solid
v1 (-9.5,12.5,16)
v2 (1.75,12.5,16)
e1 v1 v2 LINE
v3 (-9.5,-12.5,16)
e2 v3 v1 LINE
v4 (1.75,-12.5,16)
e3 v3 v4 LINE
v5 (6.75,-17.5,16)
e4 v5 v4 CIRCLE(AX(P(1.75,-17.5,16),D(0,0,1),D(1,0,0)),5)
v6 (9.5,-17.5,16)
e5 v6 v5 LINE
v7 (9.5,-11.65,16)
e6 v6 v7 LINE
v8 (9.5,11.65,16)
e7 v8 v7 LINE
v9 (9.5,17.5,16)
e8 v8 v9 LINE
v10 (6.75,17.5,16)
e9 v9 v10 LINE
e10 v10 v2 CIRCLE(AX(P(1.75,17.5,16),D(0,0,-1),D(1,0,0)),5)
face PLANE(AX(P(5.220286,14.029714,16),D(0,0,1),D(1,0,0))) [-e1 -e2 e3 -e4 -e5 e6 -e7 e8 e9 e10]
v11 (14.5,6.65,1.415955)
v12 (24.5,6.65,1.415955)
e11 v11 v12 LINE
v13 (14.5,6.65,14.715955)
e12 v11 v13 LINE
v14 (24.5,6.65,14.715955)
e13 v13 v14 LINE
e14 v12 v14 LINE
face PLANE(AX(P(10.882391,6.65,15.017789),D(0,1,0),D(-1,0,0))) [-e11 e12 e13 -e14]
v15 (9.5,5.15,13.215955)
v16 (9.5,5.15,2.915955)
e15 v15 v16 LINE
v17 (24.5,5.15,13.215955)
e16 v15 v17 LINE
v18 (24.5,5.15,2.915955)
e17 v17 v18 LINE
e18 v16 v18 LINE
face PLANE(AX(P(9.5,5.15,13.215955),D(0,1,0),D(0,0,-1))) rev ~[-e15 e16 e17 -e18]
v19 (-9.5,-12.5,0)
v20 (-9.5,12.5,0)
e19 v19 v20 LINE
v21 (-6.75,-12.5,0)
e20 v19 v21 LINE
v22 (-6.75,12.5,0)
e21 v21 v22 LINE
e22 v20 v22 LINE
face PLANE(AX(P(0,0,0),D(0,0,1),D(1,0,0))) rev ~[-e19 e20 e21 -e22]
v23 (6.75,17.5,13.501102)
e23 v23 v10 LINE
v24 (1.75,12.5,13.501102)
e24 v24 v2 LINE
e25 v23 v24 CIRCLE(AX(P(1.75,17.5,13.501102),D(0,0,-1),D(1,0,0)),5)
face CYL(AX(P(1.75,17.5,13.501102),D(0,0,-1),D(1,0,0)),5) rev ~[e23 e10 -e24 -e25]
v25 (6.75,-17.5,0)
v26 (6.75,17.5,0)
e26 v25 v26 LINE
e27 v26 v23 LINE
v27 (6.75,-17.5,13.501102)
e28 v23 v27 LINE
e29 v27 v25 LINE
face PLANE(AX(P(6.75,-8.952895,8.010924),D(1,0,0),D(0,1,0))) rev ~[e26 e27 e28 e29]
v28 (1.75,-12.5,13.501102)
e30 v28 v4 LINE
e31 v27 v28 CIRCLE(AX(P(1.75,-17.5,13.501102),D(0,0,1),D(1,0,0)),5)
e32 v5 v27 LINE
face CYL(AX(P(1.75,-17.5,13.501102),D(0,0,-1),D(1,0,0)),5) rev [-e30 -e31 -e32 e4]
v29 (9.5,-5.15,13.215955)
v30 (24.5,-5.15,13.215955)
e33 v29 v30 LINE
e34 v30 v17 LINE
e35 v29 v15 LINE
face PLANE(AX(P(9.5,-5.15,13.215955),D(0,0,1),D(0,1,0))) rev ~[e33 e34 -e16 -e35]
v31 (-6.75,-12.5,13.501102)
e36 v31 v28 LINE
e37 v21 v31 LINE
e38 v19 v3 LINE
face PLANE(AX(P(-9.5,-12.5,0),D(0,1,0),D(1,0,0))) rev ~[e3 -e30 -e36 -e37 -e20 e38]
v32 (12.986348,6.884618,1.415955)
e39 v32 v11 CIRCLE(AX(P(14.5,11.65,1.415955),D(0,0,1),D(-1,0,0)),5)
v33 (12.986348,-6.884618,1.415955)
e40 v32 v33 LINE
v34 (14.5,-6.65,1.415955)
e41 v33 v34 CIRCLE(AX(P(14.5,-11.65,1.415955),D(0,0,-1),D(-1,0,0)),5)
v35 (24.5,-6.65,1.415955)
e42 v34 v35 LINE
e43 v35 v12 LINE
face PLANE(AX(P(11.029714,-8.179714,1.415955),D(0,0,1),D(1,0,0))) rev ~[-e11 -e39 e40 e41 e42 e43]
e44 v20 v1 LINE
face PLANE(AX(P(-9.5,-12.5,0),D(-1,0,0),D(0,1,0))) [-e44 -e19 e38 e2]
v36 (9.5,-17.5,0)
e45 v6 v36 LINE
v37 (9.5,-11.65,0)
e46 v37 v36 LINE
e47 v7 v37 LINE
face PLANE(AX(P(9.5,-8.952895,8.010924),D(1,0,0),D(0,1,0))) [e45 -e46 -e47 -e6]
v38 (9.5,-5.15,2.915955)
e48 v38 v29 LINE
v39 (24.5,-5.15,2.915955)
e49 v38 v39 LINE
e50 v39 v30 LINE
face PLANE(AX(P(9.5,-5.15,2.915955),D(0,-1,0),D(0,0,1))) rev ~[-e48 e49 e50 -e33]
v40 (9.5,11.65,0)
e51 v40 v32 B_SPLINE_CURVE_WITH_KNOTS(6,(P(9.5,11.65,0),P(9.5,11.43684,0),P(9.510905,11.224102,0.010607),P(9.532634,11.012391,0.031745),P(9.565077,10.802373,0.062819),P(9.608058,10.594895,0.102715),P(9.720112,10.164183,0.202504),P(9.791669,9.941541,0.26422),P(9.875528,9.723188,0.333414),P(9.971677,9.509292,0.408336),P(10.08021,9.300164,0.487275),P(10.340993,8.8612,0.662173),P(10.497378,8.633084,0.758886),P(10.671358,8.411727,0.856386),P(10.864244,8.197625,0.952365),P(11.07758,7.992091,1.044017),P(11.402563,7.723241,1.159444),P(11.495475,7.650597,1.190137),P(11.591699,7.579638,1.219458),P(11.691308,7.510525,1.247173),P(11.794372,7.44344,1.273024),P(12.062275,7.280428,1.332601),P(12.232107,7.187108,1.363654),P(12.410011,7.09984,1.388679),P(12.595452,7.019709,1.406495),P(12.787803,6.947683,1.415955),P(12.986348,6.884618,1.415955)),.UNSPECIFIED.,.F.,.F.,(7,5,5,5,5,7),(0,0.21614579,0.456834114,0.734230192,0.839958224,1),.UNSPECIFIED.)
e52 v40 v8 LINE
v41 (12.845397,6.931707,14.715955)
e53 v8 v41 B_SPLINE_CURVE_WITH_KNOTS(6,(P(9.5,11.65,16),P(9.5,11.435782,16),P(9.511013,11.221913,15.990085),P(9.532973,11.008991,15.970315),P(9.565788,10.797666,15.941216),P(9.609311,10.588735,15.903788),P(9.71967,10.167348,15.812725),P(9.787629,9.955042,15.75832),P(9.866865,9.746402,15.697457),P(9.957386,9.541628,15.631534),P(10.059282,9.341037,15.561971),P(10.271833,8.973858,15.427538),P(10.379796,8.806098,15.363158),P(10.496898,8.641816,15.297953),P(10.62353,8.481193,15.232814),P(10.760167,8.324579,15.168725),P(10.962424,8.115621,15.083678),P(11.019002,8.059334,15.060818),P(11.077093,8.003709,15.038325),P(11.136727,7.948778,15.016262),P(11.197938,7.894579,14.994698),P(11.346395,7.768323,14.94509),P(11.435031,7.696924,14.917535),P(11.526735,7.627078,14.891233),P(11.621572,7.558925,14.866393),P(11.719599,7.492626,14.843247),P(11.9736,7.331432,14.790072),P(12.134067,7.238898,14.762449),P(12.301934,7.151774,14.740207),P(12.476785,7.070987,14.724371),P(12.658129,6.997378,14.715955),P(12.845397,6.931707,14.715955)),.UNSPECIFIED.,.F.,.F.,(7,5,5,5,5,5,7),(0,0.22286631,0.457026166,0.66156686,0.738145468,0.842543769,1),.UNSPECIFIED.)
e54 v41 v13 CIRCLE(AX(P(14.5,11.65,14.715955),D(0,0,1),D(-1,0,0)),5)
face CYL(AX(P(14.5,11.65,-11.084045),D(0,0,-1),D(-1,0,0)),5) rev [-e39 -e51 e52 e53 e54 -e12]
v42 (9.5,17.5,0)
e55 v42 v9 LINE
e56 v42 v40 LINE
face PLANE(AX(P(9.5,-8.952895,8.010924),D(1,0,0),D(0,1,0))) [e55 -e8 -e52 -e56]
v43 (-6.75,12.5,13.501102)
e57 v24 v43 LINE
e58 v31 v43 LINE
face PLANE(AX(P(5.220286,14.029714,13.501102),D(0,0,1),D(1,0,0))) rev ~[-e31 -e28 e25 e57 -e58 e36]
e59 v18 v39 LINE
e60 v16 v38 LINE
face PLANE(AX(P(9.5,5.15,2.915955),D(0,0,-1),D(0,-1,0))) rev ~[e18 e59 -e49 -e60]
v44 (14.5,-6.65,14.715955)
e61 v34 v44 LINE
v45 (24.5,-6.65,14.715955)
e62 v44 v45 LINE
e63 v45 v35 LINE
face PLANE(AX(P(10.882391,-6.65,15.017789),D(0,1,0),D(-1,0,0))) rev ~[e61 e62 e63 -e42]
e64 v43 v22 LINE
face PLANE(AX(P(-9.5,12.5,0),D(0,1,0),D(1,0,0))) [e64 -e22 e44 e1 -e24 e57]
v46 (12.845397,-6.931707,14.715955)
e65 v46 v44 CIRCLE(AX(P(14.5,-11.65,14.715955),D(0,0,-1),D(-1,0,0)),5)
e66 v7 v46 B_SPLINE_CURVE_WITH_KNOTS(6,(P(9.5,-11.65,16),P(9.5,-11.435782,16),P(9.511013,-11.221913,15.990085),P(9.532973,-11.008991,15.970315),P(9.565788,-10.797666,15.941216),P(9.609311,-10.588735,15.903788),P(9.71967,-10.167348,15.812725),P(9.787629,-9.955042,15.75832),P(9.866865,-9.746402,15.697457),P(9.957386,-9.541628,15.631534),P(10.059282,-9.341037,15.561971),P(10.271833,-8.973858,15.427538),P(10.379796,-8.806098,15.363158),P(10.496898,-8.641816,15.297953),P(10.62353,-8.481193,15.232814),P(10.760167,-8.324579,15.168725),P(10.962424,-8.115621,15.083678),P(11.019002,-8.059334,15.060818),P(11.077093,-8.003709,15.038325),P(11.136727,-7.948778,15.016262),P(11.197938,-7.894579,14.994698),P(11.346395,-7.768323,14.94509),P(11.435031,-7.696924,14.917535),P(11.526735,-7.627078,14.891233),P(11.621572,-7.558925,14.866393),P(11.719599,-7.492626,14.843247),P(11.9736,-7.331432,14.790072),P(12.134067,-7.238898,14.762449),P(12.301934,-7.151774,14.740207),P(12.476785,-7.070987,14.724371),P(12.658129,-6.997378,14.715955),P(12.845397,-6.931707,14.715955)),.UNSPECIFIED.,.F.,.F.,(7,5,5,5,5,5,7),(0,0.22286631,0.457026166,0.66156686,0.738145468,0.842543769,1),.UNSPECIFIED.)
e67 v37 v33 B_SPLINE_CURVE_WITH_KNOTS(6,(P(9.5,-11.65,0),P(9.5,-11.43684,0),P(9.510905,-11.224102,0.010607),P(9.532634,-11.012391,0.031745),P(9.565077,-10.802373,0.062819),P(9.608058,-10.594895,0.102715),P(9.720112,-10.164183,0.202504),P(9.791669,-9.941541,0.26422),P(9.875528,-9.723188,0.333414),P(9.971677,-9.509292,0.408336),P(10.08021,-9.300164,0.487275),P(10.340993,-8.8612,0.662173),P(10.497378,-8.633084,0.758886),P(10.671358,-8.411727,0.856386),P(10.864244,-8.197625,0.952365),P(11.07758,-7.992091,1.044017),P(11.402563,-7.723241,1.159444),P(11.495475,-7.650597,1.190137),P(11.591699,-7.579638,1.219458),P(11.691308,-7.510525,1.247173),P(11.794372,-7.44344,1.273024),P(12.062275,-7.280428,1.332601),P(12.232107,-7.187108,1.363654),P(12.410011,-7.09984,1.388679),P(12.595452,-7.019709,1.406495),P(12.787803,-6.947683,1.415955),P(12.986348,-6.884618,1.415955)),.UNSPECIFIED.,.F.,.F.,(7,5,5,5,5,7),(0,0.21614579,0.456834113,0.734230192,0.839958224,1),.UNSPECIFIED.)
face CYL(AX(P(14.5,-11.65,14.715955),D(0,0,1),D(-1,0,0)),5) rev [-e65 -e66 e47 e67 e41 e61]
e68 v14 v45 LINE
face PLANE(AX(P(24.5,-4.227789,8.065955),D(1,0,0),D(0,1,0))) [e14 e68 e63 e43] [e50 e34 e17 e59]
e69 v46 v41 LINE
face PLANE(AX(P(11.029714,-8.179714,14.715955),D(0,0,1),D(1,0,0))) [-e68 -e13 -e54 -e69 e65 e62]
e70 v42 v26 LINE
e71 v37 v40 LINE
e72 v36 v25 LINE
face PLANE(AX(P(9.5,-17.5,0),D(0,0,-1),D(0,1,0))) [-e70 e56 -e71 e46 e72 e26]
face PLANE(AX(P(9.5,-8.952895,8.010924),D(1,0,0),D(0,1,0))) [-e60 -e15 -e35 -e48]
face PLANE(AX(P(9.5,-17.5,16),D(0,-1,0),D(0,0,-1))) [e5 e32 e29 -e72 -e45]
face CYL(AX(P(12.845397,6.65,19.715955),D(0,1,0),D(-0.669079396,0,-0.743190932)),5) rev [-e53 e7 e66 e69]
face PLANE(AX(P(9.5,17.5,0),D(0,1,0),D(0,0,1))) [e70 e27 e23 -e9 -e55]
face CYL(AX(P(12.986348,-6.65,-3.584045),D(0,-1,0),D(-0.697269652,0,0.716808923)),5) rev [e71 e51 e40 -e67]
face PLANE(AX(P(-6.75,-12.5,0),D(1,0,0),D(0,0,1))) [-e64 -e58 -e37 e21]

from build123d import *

# Parameters (mm, degrees)
F0_W         = 19
F0_H         = 25
F1_DEPTH     = 16
F2_W         = 13.5
F2_H         = 13.5011018194
F3_DEPTH     = 50
F4_W         = 5.15
F4_H         = 10.3
F5_DEPTH     = 2.75
F6_DEPTH     = 15
F7_T1_DEPTH  = 2.4988981806
F7_T3_DEPTH  = 13.2999992773
F7_T5_DEPTH  = 13.2999992773
F7_T11_DEPTH = 21.6634917276
F7_T15_DEPTH = 25.7999992773
F7_T23_DEPTH = 21.6634917276
F7_T27_DEPTH = 25.7999992773
F7_T35_DEPTH = 22.0158699277
F7_T39_DEPTH = 25.7999992773
F7_T47_DEPTH = 25.7999992773
F7_T52_DEPTH = 22.0158699277


# Not quite as in the source:
# - a fillet or chamfer that OpenCascade refuses, or shapes differently, is made with other operations: its cross-section is extruded or revolved along the edge and cut away or added
# - a feature names something its author has since deleted; it is built from what else it names


with BuildPart() as f1:
    # F0 (on Top) → F1 (new body)
    with BuildSketch(Plane.XY):
        Rectangle(F0_W, F0_H)
    extrude(amount=F1_DEPTH)

    # F2 (on face) → F3 (cut)
    with BuildSketch(Plane.XZ.offset(12.5)):
        with Locations((0, 6.7505509097)):
            Rectangle(F2_W, F2_H)
    extrude(amount=-F3_DEPTH, mode=Mode.SUBTRACT)

    # F4 (on face) → F5 (join)
    with BuildSketch(Plane.YZ.offset(9.5)):
        Polygon((0, 16), (-17.5, 16), (-17.5, 0), (0, 0), (0, 1.4159553841), (-6.6499996386, 1.4159553841), (-6.6499996386, 14.7159546614), (0, 14.7159546614), align=None)
        Polygon((17.5, 16), (0, 16), (0, 14.7159546614), (6.6499996386, 14.7159546614), (6.6499996386, 1.4159553841), (0, 1.4159553841), (0, 0), (17.5, 0), align=None)
        with Locations((-2.575, 8.0659550227)):
            Rectangle(F4_W, F4_H)
        with Locations((2.575, 8.0659550227)):
            Rectangle(F4_W, F4_H)
        Polygon((0, 13.2159550227), (0, 14.7159546614), (-6.6499996386, 14.7159546614), (-6.6499996386, 1.4159553841), (0, 1.4159553841), (0, 2.9159550227), (-5.15, 2.9159550227), (-5.15, 13.2159550227), align=None)
        Polygon((6.6499996386, 14.7159546614), (0, 14.7159546614), (0, 13.2159550227), (5.15, 13.2159550227), (5.15, 2.9159550227), (0, 2.9159550227), (0, 1.4159553841), (6.6499996386, 1.4159553841), align=None)
    extrude(amount=-F5_DEPTH)

    # F4 (on face) → F6 (join)
    with BuildSketch(Plane.YZ.offset(9.5)):
        Polygon((0, 13.2159550227), (0, 14.7159546614), (-6.6499996386, 14.7159546614), (-6.6499996386, 1.4159553841), (0, 1.4159553841), (0, 2.9159550227), (-5.15, 2.9159550227), (-5.15, 13.2159550227), align=None)
        Polygon((6.6499996386, 14.7159546614), (0, 14.7159546614), (0, 13.2159550227), (5.15, 13.2159550227), (5.15, 2.9159550227), (0, 2.9159550227), (0, 1.4159553841), (6.6499996386, 1.4159553841), align=None)
    extrude(amount=F6_DEPTH)

    # F7: fillet of radius 5 on 6 edges, made by hand

    # F7_s2 → F7_t1 (join)
    with BuildSketch(Plane.XY.offset(13.5011018194)):
        with BuildLine():
            ThreePointArc((6.75, 17.5), (5.2855339059, 13.9644660941), (1.75, 12.5))
            Line((1.75, 12.5), (6.75, 12.5))
            Line((6.75, 12.5), (6.75, 17.5))
        make_face()
        with BuildLine():
            ThreePointArc((6.75, -17.5), (5.2855339059, -13.9644660941), (1.75, -12.5))
            Line((1.75, -12.5), (6.75, -12.5))
            Line((6.75, -12.5), (6.75, -17.5))
        make_face()
    extrude(amount=F7_T1_DEPTH)

    # F7_s4 → F7_t3 (join)
    with BuildSketch(Plane.XZ.offset(-6.6499996386)):
        with BuildLine():
            ThreePointArc((9.5, 16), (11.0537180617, 15.0479907955), (12.8453969801, 14.7159546614))
            Line((12.8453969801, 14.7159546614), (9.5, 14.7159546614))
            Line((9.5, 14.7159546614), (9.5, 16))
        make_face()
        with BuildLine():
            ThreePointArc((9.5, 0), (11.1048891295, 1.0484613517), (12.9863482602, 1.4159553841))
            Line((12.9863482602, 1.4159553841), (9.5, 1.4159553841))
            Line((9.5, 1.4159553841), (9.5, 0))
        make_face()
    extrude(amount=F7_T3_DEPTH)

    # F7_s6 → F7_t5 (join)
    with BuildSketch(Plane.XY.offset(1.4159553841)):
        with BuildLine():
            ThreePointArc((9.5, -11.6499996386), (10.9644660941, -8.1144657327), (14.5, -6.6499996386))
            Line((14.5, -6.6499996386), (9.5, -6.6499996386))
            Line((9.5, -6.6499996386), (9.5, -11.6499996386))
        make_face()
        with BuildLine():
            ThreePointArc((9.5, 11.6499996386), (10.9644660941, 8.1144657327), (14.5, 6.6499996386))
            Line((14.5, 6.6499996386), (9.5, 6.6499996386))
            Line((9.5, 6.6499996386), (9.5, 11.6499996386))
        make_face()
    extrude(amount=F7_T5_DEPTH)


with BuildPart() as f7_tool9:
    # F7_s10 → F7_t11 (new body)
    with BuildSketch(Plane.XZ.offset(-15.013492089)):
        with BuildLine():
            ThreePointArc((9.5, 16), (11.0537180617, 15.0479907955), (12.8453969801, 14.7159546614))
            Line((12.8453969801, 14.7159546614), (9.5, 14.7159546614))
            Line((9.5, 14.7159546614), (9.5, 16))
        make_face()
    extrude(amount=F7_T11_DEPTH)

    split(bisect_by=Plane.XZ.offset(-6.6499996386), keep=Keep.BOTTOM)


with BuildPart() as f7_tool13:
    # F7_s14 → F7_t15 (new body)
    with BuildSketch(Plane.XY.offset(1.4159553841)):
        with BuildLine():
            ThreePointArc((9.5, 11.6499996386), (10.9644660941, 8.1144657327), (14.5, 6.6499996386))
            Line((14.5, 6.6499996386), (9.5, 6.6499996386))
            Line((9.5, 6.6499996386), (9.5, 11.6499996386))
        make_face()
    extrude(amount=F7_T15_DEPTH)

    split(bisect_by=Plane.XY.offset(16), keep=Keep.BOTTOM)

    split(bisect_by=Plane.XY.offset(14.7159546614), keep=Keep.TOP)


with BuildPart() as f7_tool9_1:
    add(f7_tool9.part)

    # F7_t18: intersect F7_tool13
    add(f7_tool13.part, mode=Mode.INTERSECT)


with BuildPart() as f1_1:
    add(f1.part)

    # F7_t7: union F7_tool9
    add(f7_tool9_1.part)


with BuildPart() as f7_tool21:
    # F7_s22 → F7_t23 (new body)
    with BuildSketch(Plane.XZ.offset(-6.6499996386)):
        with BuildLine():
            ThreePointArc((9.5, 16), (11.0537180617, 15.0479907955), (12.8453969801, 14.7159546614))
            Line((12.8453969801, 14.7159546614), (9.5, 14.7159546614))
            Line((9.5, 14.7159546614), (9.5, 16))
        make_face()
    extrude(amount=F7_T23_DEPTH)

    split(bisect_by=Plane.XZ.offset(6.6499996386), keep=Keep.TOP)


with BuildPart() as f7_tool25:
    # F7_s26 → F7_t27 (new body)
    with BuildSketch(Plane.XY.offset(27.2159546614)):
        with BuildLine():
            ThreePointArc((9.5, -11.6499996386), (10.9644660941, -8.1144657327), (14.5, -6.6499996386))
            Line((14.5, -6.6499996386), (9.5, -6.6499996386))
            Line((9.5, -6.6499996386), (9.5, -11.6499996386))
        make_face()
    extrude(amount=-F7_T27_DEPTH)

    split(bisect_by=Plane.XY.offset(16), keep=Keep.BOTTOM)

    split(bisect_by=Plane.XY.offset(14.7159546614), keep=Keep.TOP)


with BuildPart() as f7_tool21_1:
    add(f7_tool21.part)

    # F7_t30: intersect F7_tool25
    add(f7_tool25.part, mode=Mode.INTERSECT)


with BuildPart() as f1_2:
    add(f1_1.part)

    # F7_t19: union F7_tool21
    add(f7_tool21_1.part)


with BuildPart() as f7_tool33:
    # F7_s34 → F7_t35 (new body)
    with BuildSketch(Plane.XZ.offset(15.365870289)):
        with BuildLine():
            ThreePointArc((9.5, 0), (11.1048891295, 1.0484613517), (12.9863482602, 1.4159553841))
            Line((12.9863482602, 1.4159553841), (9.5, 1.4159553841))
            Line((9.5, 1.4159553841), (9.5, 0))
        make_face()
    extrude(amount=-F7_T35_DEPTH)

    split(bisect_by=Plane.XZ.offset(6.6499996386), keep=Keep.TOP)


with BuildPart() as f7_tool37:
    # F7_s38 → F7_t39 (new body)
    with BuildSketch(Plane.XY.offset(14.7159546614)):
        with BuildLine():
            ThreePointArc((9.5, -11.6499996386), (10.9644660941, -8.1144657327), (14.5, -6.6499996386))
            Line((14.5, -6.6499996386), (9.5, -6.6499996386))
            Line((9.5, -6.6499996386), (9.5, -11.6499996386))
        make_face()
    extrude(amount=-F7_T39_DEPTH)

    split(bisect_by=Plane.XY, keep=Keep.TOP)

    split(bisect_by=Plane.XY.offset(1.4159553841), keep=Keep.BOTTOM)


with BuildPart() as f7_tool33_1:
    add(f7_tool33.part)

    # F7_t42: intersect F7_tool37
    add(f7_tool37.part, mode=Mode.INTERSECT)


with BuildPart() as f1_3:
    add(f1_2.part)

    # F7_t31: union F7_tool33
    add(f7_tool33_1.part)


with BuildPart() as f7_tool45:
    # F7_s46 → F7_t47 (new body)
    with BuildSketch(Plane.XY.offset(-11.0840446159)):
        with BuildLine():
            ThreePointArc((9.5, 11.6499996386), (10.9644660941, 8.1144657327), (14.5, 6.6499996386))
            Line((14.5, 6.6499996386), (9.5, 6.6499996386))
            Line((9.5, 6.6499996386), (9.5, 11.6499996386))
        make_face()
    extrude(amount=F7_T47_DEPTH)

    split(bisect_by=Plane.XY, keep=Keep.TOP)

    split(bisect_by=Plane.XY.offset(1.4159553841), keep=Keep.BOTTOM)


with BuildPart() as f7_tool50:
    # F7_s51 → F7_t52 (new body)
    with BuildSketch(Plane.XZ.offset(6.6499996386)):
        with BuildLine():
            ThreePointArc((9.5, 0), (11.1048891295, 1.0484613517), (12.9863482602, 1.4159553841))
            Line((12.9863482602, 1.4159553841), (9.5, 1.4159553841))
            Line((9.5, 1.4159553841), (9.5, 0))
        make_face()
    extrude(amount=-F7_T52_DEPTH)

    split(bisect_by=Plane.XZ.offset(-6.6499996386), keep=Keep.BOTTOM)


with BuildPart() as f7_tool45_1:
    add(f7_tool45.part)

    # F7_t54: intersect F7_tool50
    add(f7_tool50.part, mode=Mode.INTERSECT)


with BuildPart() as f1_4:
    add(f1_3.part)

    # F7_t43: union F7_tool45
    add(f7_tool45_1.part)


solid = f1_4.part
